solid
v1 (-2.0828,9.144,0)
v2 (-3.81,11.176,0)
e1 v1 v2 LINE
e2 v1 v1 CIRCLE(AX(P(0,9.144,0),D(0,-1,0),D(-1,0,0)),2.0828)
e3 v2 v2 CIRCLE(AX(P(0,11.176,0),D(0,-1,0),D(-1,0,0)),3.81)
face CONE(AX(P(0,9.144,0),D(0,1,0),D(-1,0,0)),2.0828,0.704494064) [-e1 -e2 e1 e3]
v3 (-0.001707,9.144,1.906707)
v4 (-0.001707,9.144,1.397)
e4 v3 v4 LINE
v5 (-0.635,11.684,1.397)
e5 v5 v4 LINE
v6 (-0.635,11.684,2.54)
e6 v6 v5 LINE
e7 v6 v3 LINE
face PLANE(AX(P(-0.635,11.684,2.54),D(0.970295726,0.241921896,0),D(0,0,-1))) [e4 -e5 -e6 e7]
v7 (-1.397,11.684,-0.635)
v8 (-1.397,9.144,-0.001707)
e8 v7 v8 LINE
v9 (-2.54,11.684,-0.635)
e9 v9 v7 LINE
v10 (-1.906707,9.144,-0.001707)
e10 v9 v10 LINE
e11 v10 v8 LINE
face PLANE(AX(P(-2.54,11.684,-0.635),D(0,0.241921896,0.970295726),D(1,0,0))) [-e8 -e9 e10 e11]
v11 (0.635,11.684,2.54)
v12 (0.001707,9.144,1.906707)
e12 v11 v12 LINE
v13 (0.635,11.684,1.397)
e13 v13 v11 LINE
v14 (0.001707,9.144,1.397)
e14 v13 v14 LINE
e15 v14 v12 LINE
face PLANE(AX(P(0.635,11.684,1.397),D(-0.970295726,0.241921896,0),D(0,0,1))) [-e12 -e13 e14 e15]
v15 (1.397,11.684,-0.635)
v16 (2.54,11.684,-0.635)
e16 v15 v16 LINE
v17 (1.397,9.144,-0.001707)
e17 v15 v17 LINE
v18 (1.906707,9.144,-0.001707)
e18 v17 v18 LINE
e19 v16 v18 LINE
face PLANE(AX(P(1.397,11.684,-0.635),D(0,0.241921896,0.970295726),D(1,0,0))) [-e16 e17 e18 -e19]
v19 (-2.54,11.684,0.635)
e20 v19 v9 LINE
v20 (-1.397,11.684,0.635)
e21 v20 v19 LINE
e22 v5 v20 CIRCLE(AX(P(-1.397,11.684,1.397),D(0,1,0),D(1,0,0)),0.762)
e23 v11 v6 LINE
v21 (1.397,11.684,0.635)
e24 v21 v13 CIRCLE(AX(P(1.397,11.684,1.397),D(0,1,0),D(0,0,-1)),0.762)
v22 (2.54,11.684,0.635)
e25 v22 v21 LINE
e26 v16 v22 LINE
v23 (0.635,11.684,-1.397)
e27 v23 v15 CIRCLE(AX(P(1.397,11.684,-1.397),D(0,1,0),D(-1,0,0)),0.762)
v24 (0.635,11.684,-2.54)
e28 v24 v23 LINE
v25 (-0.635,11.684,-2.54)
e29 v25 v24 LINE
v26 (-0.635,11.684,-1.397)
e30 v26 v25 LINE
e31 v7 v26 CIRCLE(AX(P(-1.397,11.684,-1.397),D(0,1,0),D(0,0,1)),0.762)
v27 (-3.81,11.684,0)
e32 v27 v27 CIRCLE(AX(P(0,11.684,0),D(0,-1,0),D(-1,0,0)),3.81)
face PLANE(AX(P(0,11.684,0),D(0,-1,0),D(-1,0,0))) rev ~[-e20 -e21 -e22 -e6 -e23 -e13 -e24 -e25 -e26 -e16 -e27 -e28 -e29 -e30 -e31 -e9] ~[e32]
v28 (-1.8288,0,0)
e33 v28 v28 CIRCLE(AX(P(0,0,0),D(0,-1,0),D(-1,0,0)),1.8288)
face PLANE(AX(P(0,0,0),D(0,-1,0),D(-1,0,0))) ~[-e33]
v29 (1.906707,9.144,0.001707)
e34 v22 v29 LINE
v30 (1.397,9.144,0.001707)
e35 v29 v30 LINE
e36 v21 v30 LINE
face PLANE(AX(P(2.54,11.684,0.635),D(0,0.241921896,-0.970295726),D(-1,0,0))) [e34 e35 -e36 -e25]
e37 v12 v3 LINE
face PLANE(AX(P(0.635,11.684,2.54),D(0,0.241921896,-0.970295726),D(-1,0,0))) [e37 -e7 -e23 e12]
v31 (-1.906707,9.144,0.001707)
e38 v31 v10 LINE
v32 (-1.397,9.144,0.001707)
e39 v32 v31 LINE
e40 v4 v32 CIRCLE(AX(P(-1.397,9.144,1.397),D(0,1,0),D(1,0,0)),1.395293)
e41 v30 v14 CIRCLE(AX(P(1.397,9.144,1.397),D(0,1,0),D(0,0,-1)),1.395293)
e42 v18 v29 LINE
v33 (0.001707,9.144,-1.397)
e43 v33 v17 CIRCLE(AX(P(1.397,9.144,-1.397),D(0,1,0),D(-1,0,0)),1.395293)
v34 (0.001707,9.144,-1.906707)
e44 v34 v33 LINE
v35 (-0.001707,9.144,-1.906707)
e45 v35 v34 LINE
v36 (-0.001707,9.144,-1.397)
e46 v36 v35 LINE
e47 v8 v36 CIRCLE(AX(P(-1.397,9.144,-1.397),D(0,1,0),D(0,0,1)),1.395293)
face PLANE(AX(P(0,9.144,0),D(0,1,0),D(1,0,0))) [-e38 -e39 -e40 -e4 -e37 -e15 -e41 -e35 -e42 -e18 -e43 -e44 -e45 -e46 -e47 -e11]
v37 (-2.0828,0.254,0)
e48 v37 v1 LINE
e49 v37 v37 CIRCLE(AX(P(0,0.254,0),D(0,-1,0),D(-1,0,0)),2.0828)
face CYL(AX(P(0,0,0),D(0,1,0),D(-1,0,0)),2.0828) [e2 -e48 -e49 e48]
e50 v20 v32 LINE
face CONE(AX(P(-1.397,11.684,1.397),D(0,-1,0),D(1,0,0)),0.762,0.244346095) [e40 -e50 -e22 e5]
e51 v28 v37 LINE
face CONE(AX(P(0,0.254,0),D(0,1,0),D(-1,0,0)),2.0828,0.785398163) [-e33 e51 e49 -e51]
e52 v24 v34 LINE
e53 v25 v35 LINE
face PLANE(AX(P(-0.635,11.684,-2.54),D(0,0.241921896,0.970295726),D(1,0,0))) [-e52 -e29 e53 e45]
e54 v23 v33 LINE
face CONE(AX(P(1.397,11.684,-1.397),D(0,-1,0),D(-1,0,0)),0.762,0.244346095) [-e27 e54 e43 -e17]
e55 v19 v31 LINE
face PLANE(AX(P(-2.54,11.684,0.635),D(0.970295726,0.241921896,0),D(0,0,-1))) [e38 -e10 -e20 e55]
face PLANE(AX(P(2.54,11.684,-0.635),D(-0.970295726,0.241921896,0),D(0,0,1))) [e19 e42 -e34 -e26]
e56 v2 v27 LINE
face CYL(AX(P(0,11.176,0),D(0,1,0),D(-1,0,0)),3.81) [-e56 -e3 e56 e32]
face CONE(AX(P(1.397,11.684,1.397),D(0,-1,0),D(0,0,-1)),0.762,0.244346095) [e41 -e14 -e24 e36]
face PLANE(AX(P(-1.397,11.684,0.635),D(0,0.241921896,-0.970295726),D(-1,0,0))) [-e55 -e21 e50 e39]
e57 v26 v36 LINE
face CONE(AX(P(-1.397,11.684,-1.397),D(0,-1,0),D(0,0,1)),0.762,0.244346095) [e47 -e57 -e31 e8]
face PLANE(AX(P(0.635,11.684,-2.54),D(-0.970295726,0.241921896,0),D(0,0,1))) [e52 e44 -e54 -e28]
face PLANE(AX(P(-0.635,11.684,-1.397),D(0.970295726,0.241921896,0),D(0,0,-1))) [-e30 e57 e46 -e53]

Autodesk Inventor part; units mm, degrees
ref_plane "YZ Plane" through (0, 0, 0) normal (1, 0, 0) x (0, 1, 0)
ref_plane "XZ Plane" through (0, 0, 0) normal (0, 1, 0) x (-1, 0, 0)
ref_plane "XY Plane" through (0, 0, 0) normal (0, 0, 1) x (1, 0, 0)
sketch "Sketch1" plane through (0, 0, 0) normal (0, 0, 1) x (1, 0, 0)
  line L0 (0, 0) -> (-2.0828, 0)
  line L1 (-2.0828, 0) -> (-2.0828, 9.144)
  line L2 (-2.0828, 9.144) -> (0, 9.144)
  line L3 (0, 9.144) -> (0, 0)
  line L4 (-2.0828, 9.144) -> (-3.81, 11.176)
  line L5 (-3.81, 11.176) -> (-3.81, 11.684)
  line L6 (-3.81, 11.684) -> (0, 11.684)
  line L7 (0, 11.684) -> (0, 9.144)
  dimension "d0" = 4.1656
  dimension "d1" = 9.144
  dimension "d2" = 7.62
  dimension "d3" = 0.508
  dimension "d4" = 2.54
revolve "Revolution1" add sketch "Sketch1" angle 360 about axis through (0, 9.144, 0) along (0, -1, 0)
thread "Thread1" size "8-32 UNC" class "2A" standard "ANSI Unified Screw Threads" full length
sketch "Sketch2" plane through (0, 11.684, 0) normal (0, 1, 0) x (1, 0, 0)
  circle A0 centre (0, 0) radius 3.81 projected
  line L0 (2.54, 0.635) -> (2.54, -0.635)
  line L1 (-2.54, -0.635) -> (-2.54, 0.635)
  line L2 (-0.635, 2.54) -> (0.635, 2.54)
  line L3 (0.635, -2.54) -> (-0.635, -2.54)
  line L4 (-0.635, -2.54) -> (-0.635, -1.397)
  line L5 (-0.635, 1.397) -> (-0.635, 2.54)
  line L6 (2.54, -0.635) -> (1.397, -0.635)
  line L7 (-1.397, -0.635) -> (-2.54, -0.635)
  line L8 (0.635, 2.54) -> (0.635, 1.397)
  line L9 (0.635, -1.397) -> (0.635, -2.54)
  line L10 (-2.54, 0.635) -> (-1.397, 0.635)
  line L11 (1.397, 0.635) -> (2.54, 0.635)
  line L12 (0, 2.54) -> (0, 0) construction
  line L13 (0, 0) -> (-2.54, 0) construction
  arc A1 (-0.635, -1.397) -> (-1.397, -0.635) centre (-1.397, -1.397) ccw
  arc A2 (1.397, -0.635) -> (0.635, -1.397) centre (1.397, -1.397) ccw
  arc A3 (0.635, 1.397) -> (1.397, 0.635) centre (1.397, 1.397) ccw
  arc A4 (-1.397, 0.635) -> (-0.635, 1.397) centre (-1.397, 1.397) ccw
  dimension "d8" = 1.27
  dimension "d9" = 5.08
  dimension "d10" = 0.762
extrude "Extrusion1" cut sketch "Sketch2" against normal blind 2.54 draft -14 contours L0 L6 A2 L9 L3 L4 A1 L7 L1 L10 A4 L5 L2 L8 A3 L11
chamfer "Chamfer1" distance 0.254 angle 45 1 edges at (2.0828, 0, 0)
properties material "Steel"
